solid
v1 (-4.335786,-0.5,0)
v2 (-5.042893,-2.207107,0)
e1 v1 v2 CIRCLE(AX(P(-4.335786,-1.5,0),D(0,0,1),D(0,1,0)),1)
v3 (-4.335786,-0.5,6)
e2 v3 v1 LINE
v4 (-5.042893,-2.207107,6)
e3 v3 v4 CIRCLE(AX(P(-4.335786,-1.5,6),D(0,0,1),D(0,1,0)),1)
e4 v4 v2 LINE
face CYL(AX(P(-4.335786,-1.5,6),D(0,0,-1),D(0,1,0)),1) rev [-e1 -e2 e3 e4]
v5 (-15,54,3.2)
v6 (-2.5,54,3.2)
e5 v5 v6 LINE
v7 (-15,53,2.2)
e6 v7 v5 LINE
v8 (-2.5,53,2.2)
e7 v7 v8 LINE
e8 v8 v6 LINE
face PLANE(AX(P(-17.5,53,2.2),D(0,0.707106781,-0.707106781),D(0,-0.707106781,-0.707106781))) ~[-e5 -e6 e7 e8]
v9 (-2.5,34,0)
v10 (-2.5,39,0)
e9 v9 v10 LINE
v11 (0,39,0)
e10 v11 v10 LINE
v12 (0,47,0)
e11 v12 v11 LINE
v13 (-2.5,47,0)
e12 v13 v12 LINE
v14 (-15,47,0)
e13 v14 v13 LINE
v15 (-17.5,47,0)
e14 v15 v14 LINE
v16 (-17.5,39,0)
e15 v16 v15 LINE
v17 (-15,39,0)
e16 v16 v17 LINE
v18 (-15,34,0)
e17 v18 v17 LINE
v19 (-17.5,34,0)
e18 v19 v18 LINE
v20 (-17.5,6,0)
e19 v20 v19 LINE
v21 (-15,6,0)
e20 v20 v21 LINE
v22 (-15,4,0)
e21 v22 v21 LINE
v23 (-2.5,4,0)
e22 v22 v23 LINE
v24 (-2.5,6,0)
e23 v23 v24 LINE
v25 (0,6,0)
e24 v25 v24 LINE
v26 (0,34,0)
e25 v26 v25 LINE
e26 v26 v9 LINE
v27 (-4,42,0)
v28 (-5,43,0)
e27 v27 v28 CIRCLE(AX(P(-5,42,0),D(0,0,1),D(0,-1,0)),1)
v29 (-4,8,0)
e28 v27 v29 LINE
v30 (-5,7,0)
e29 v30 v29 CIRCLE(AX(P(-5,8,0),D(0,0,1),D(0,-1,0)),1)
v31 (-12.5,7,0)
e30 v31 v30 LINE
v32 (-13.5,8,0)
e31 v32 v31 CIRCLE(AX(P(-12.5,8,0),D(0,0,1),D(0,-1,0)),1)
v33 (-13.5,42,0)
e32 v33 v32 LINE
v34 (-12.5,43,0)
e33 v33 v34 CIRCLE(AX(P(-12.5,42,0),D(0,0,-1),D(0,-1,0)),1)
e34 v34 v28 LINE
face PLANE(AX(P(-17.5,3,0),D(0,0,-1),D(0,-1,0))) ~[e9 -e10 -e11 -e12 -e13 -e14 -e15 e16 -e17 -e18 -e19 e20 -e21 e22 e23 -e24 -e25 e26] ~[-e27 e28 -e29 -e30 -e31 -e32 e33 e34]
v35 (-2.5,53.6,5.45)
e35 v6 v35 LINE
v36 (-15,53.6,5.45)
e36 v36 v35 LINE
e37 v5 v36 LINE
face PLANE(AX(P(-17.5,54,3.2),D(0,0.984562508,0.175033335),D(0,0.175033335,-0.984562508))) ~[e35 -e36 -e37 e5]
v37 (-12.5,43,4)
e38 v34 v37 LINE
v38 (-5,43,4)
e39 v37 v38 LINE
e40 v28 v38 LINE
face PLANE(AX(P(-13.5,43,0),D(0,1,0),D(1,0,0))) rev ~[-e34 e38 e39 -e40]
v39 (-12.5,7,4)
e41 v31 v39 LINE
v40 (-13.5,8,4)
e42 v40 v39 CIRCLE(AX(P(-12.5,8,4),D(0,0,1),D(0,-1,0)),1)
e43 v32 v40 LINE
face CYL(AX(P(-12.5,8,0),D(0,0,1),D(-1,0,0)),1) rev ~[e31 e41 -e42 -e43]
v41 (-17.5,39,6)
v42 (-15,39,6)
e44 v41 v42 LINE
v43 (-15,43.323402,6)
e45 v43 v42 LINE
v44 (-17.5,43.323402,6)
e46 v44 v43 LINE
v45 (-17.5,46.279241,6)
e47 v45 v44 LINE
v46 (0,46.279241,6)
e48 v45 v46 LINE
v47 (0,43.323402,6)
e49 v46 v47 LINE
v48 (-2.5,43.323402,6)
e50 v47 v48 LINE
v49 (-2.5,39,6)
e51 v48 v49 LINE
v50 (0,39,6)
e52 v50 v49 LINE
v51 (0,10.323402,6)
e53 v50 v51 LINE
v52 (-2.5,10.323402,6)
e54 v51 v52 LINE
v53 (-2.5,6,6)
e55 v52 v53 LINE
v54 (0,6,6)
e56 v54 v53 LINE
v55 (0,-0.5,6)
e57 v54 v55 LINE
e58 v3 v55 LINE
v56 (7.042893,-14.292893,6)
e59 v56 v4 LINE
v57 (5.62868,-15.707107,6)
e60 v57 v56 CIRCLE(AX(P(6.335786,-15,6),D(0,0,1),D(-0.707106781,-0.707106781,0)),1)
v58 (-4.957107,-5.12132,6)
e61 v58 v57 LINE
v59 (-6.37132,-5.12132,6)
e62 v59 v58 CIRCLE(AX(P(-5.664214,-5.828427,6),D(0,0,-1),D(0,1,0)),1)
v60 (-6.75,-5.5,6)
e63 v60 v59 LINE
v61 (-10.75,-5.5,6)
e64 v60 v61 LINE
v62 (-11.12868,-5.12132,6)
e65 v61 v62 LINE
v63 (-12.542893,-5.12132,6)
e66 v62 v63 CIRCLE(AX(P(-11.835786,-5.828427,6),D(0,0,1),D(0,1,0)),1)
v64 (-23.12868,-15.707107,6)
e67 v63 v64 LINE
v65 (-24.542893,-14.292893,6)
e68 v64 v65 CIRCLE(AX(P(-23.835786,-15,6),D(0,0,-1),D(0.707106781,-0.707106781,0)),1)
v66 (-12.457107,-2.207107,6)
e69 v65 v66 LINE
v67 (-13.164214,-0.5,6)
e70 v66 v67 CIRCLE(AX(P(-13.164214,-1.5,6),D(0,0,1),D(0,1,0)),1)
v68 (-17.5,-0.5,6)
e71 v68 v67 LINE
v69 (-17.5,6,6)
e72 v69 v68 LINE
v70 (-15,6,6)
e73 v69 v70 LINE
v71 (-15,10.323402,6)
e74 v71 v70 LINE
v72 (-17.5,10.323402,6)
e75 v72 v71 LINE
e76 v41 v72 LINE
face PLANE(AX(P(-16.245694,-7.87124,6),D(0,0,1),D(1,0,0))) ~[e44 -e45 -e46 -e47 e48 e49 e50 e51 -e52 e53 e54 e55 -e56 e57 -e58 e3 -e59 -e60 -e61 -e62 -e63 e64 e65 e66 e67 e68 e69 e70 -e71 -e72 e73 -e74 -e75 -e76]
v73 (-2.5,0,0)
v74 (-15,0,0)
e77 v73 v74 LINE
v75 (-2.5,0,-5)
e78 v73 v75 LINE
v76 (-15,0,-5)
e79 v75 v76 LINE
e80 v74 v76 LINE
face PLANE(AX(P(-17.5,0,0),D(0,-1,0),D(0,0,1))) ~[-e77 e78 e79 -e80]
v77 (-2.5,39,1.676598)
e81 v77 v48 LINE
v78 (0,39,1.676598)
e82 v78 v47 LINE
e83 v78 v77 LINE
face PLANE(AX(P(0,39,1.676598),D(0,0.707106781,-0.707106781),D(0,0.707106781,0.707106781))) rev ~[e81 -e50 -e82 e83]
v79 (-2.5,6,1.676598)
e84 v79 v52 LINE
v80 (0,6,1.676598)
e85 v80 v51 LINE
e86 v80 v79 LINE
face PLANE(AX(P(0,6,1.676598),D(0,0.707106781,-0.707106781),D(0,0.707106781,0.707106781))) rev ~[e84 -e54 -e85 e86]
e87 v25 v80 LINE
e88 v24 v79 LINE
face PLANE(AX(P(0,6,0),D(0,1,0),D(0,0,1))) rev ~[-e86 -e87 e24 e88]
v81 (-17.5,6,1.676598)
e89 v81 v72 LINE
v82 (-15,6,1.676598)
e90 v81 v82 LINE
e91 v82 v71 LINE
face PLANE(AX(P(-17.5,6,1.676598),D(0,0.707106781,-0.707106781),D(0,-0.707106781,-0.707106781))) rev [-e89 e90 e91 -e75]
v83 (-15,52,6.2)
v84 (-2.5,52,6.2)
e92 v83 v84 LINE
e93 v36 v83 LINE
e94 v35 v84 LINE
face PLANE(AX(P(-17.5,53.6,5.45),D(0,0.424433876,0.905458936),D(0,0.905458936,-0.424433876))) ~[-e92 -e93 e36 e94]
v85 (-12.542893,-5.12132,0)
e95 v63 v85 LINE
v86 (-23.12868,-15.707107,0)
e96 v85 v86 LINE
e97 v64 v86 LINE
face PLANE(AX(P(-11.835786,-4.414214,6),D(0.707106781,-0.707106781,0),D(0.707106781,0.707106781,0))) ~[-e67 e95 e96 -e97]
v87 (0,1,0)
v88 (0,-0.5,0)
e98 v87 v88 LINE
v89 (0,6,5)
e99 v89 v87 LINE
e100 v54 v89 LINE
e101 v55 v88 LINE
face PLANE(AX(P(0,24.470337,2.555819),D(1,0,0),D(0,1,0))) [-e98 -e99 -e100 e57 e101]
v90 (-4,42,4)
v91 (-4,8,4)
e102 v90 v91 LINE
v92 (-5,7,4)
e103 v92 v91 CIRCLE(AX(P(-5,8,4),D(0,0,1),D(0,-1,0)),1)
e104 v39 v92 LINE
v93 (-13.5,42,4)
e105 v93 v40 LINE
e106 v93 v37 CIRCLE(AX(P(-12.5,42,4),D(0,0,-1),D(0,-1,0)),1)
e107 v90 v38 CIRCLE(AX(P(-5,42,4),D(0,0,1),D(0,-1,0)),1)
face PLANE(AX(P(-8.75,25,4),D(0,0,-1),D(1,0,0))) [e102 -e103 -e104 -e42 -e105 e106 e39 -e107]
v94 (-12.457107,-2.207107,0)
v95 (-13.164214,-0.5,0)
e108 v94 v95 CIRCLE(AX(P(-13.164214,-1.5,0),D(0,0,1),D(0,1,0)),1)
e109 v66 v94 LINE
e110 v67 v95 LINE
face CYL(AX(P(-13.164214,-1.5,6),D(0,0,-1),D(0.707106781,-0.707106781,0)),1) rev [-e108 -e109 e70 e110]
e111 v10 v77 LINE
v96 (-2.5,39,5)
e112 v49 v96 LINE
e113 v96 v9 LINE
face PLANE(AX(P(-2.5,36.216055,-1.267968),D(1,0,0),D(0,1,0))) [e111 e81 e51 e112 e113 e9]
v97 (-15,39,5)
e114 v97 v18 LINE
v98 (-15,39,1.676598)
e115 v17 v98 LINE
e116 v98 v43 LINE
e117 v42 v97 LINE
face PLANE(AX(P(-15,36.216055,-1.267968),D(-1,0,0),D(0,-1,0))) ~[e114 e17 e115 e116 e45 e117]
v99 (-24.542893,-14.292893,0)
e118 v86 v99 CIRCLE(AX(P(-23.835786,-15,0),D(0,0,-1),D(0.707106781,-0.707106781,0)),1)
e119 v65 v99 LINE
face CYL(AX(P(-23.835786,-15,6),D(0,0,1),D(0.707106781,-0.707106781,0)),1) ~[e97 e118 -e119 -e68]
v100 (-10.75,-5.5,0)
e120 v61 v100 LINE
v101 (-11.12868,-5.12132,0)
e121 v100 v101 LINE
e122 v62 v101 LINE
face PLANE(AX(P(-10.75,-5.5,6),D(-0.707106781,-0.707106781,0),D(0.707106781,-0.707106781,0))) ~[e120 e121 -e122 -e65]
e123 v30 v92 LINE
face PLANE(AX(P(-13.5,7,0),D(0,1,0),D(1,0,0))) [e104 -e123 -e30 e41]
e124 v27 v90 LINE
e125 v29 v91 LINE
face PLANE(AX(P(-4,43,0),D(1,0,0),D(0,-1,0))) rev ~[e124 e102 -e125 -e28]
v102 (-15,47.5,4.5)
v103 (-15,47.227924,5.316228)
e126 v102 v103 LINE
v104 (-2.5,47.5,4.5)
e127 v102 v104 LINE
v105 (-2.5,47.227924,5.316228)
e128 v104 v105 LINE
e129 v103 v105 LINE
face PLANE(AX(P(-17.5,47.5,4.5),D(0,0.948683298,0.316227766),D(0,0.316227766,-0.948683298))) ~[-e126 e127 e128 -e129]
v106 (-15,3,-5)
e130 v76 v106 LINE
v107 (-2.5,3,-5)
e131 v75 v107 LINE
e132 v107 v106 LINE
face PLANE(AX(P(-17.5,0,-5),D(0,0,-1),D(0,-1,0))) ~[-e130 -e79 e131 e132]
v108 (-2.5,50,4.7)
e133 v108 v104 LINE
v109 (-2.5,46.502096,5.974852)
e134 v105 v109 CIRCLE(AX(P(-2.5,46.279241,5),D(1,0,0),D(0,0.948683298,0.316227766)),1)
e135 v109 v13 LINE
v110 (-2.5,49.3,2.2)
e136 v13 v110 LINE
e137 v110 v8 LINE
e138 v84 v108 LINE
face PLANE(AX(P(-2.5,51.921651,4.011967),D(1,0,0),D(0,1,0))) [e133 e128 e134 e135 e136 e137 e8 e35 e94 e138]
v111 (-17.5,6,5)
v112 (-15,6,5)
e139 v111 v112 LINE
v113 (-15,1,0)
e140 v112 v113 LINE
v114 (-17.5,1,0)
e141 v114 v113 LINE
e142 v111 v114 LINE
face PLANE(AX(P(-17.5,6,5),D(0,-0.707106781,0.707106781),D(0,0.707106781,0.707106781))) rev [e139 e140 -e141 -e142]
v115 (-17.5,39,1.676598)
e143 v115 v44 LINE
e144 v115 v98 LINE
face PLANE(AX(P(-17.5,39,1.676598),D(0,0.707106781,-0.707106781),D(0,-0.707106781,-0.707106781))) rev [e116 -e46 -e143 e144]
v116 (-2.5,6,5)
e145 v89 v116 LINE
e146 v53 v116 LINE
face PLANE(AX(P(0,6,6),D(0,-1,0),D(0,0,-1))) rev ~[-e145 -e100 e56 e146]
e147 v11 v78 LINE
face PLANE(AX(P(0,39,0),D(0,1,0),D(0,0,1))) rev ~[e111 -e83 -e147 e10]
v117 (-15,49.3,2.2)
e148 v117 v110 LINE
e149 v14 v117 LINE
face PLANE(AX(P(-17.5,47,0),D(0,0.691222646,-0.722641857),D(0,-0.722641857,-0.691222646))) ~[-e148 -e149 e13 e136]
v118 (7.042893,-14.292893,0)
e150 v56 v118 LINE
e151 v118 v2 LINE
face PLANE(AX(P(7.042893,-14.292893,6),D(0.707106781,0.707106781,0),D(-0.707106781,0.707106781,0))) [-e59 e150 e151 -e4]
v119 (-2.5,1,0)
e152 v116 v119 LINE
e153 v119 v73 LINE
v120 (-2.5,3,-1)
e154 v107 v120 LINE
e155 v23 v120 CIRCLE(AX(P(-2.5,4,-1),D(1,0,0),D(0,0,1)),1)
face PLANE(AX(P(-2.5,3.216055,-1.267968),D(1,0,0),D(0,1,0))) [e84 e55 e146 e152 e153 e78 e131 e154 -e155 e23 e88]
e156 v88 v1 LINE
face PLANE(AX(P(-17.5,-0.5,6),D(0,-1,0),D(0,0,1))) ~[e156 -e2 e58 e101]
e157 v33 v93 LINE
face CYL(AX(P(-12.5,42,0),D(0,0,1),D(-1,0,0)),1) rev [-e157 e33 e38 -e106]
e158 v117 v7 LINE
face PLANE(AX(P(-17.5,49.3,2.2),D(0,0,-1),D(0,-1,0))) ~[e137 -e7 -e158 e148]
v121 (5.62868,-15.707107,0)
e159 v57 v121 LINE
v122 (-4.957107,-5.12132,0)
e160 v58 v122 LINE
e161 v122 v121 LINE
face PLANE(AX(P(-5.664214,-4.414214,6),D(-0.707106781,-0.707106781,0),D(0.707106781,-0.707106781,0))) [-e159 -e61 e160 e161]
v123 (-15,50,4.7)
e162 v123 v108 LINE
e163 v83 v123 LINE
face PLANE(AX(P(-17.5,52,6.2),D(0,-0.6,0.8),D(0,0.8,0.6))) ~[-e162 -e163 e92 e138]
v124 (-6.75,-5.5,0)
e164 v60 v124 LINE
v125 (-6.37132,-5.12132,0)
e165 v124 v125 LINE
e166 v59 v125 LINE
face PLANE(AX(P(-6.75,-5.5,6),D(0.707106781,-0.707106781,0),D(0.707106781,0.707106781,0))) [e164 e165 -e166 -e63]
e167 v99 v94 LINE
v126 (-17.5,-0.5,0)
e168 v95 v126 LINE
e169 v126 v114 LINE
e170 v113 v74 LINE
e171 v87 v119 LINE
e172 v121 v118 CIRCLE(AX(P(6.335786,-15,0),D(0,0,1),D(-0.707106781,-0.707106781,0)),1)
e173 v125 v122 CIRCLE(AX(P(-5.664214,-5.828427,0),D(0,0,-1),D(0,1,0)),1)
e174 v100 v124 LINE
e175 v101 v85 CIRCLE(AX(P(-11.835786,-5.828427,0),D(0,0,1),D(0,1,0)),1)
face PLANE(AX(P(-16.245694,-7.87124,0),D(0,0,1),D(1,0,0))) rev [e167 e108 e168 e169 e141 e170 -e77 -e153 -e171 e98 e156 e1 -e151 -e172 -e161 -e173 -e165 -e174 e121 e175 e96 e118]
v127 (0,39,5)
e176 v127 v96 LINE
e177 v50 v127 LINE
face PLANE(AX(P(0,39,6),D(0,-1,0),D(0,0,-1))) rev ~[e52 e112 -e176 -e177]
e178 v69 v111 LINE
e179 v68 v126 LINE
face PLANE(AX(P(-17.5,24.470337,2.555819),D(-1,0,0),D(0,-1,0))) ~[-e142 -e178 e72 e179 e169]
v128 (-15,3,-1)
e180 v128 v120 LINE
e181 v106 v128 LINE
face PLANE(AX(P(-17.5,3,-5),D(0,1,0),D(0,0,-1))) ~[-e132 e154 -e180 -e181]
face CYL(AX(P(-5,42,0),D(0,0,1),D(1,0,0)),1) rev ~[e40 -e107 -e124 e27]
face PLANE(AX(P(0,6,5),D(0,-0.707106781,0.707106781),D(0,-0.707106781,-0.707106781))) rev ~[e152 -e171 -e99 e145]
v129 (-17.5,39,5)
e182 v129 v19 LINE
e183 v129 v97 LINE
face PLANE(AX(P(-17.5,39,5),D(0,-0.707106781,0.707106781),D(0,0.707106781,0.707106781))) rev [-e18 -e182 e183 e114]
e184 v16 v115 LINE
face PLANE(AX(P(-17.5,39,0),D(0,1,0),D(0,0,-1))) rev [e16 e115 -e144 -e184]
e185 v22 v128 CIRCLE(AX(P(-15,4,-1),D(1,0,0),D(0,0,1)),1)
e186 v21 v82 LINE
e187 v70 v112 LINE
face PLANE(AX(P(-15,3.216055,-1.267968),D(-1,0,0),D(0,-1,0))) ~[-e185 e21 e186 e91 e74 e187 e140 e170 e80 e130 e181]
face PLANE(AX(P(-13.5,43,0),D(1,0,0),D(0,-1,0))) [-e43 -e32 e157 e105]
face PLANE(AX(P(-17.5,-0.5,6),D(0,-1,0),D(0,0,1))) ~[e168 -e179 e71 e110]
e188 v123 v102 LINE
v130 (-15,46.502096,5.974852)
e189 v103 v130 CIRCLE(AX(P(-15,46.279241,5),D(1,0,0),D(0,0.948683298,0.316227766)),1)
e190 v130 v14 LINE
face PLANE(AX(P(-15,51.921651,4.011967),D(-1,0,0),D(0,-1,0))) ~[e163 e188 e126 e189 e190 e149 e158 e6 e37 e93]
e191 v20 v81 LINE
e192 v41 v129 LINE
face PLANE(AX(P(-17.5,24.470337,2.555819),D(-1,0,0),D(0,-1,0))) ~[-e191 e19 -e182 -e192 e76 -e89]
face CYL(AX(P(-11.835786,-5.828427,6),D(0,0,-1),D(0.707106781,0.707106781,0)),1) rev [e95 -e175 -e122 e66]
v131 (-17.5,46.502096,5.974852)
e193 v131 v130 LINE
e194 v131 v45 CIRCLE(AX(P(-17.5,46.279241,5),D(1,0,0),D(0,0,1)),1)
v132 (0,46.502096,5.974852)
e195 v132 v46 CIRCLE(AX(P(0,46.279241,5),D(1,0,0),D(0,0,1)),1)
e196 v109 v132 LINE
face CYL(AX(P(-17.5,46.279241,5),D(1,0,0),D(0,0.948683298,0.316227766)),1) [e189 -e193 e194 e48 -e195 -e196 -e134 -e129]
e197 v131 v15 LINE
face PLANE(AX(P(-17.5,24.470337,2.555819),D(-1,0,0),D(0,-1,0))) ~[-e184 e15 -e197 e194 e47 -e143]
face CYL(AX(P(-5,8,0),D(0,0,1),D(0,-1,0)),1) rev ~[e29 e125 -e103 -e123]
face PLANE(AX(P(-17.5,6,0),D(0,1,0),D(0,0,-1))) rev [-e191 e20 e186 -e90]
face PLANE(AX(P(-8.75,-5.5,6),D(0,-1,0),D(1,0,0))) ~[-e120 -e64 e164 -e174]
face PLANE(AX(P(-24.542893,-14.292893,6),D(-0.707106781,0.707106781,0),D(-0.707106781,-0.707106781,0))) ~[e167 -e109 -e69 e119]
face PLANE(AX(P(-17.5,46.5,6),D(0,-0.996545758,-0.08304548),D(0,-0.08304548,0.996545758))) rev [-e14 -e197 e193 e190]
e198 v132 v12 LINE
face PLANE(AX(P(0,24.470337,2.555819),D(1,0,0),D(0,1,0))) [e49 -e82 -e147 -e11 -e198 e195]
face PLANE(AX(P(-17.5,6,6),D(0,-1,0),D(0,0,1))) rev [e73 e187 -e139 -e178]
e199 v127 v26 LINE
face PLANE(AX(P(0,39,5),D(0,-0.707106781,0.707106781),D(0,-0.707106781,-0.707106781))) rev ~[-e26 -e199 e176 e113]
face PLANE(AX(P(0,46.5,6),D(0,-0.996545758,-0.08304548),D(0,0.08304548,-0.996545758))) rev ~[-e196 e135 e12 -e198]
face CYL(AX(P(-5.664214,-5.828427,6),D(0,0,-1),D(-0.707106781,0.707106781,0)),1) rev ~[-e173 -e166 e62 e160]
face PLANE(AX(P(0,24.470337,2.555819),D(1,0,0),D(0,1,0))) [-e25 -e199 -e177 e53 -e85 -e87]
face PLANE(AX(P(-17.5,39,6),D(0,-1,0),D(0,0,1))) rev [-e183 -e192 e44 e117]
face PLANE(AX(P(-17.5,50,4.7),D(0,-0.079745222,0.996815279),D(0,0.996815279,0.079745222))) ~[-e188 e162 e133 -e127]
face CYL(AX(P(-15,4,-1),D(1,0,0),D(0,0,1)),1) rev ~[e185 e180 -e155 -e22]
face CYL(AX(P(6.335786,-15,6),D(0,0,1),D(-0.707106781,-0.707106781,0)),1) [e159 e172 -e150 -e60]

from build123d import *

# Parameters (mm, degrees)
F1_DEPTH  = 8.75
F3_DEPTH  = 2.5
F4_R      = 1
F6_DEPTH  = 6
F8_DEPTH  = 2.5
F9_R      = 1
F11_W     = 9.5
F11_H     = 36
F12_DEPTH = 4
F13_R     = 1


# Not quite as in the source:
# - a feature of the source that left no trace in its solid (it failed there, or was rolled back) is left out
# - a pattern or mirror of a feature is missing from the dataset's text; its kind, count and spacing are read off the source's solid


with BuildPart() as f1:
    # F0 (on Right) → F1 (new body)
    with BuildSketch(Plane.YZ):
        Polygon((3, -5), (3, 0), (47, 0), (49.3, 2.2), (53, 2.2), (54, 3.2), (53.6, 5.45), (52, 6.2), (50, 4.7), (47.5, 4.5), (47, 6), (-0.5, 6), (-0.5, 0), (0, 0), (0, -5), align=None)
    extrude(amount=-F1_DEPTH)

    # F1_copies: F1 across plane


with BuildPart() as f1_1:
    add(f1.part)
    add(f1.part.mirror(Plane(origin=(-8.75, 0, 0), x_dir=(0, 0, -1), z_dir=(-1, 0, 0))))

    # F2 (on face) → F3 (cut)
    with BuildSketch(Plane.YZ):
        Polygon((6, 1.6765981284), (10.3234018716, 6), (6, 6), (6, 5), (1, 0), (-4.5781525858, 0), (-4.5781525858, -7.2408299893), (8, -7.2408299893), (8, 0), (6, 0), align=None)
        Polygon((41, 0), (39, 0), (39, 1.6765981284), (43.3234018716, 6), (39, 6), (39, 5), (34, 0), (28.4218474142, 0), (28.4218474142, -7.2408299893), (41, -7.2408299893), align=None)
        Polygon((74, 0), (72, 0), (72, 1.6765981284), (76.3234018716, 6), (72, 6), (72, 5), (67, 0), (61.4218474142, 0), (61.4218474142, -7.2408299893), (74, -7.2408299893), align=None)
    f3 = extrude(amount=-F3_DEPTH, mode=Mode.SUBTRACT)

    # F3_copies: F3 across plane
    add(f3.mirror(Plane(origin=(-8.75, 0, 0), x_dir=(0, 0, -1), z_dir=(-1, 0, 0))), mode=Mode.SUBTRACT)

    # F4
    f4_edges = [f1_1.edges().sort_by_distance(p)[0] for p in [
        (-8.75, 47, 6),
    ]]
    fillet(f4_edges, radius=F4_R)

    # F5 (on face) → F6 (join, through all)
    with BuildSketch(Plane.XY.offset(6)):
        with BuildLine():
            Line((-6.75, -0.5), (-8.75, -0.5))
            Line((-8.75, -0.5), (-8.75, -5.5))
            Line((-8.75, -5.5), (-6.75, -5.5))
            Line((-6.75, -5.5), (-5.6642135624, -4.4142135624))
            Line((-5.6642135624, -4.4142135624), (5.6286796564, -15.7071067812))
            ThreePointArc((5.6286796564, -15.7071067812), (7.0428932188, -15.7071067812), (7.0428932188, -14.2928932188))
            Line((7.0428932188, -14.2928932188), (-6.75, -0.5))
        make_face()
    f6 = extrude(amount=-F6_DEPTH)

    # F6_copies: F6 across plane
    add(f6.mirror(Plane(origin=(-8.75, 0, 0), x_dir=(0, 0, -1), z_dir=(-1, 0, 0))))

    # F7 (on face) → F8 (cut)
    with BuildSketch(Plane.YZ):
        Polygon((46.5, 7.9169040546), (46.5, 6), (47, 0), (57.128790766, 0), (57.128790766, 7.9169040546), align=None)
    f8 = extrude(amount=-F8_DEPTH, mode=Mode.SUBTRACT)

    # F8_copies: F8 across plane
    add(f8.mirror(Plane(origin=(-8.75, 0, 0), x_dir=(0, 0, -1), z_dir=(-1, 0, 0))), mode=Mode.SUBTRACT)

    # F9
    f9_edges = [f1_1.edges().sort_by_distance(p)[0] for p in [
        (-5.664214, -4.414214, 3),
        (-8.75, 3, 0),
        (-10.75, -0.5, 3),
        (-11.835786, -4.414214, 3),
        (-6.75, -0.5, 3),
    ]]
    fillet(f9_edges, radius=F9_R)

    # F11 (on face) → F12 (cut)
    with BuildSketch(Plane(origin=(0, 0, 0), x_dir=(1, 0, 0), z_dir=(0, 0, -1))):
        with Locations((-8.75, -25)):
            Rectangle(F11_W, F11_H)
    extrude(amount=-F12_DEPTH, mode=Mode.SUBTRACT)

    # F13
    f13_edges = [f1_1.edges().sort_by_distance(p)[0] for p in [
        (-13.5, 7, 2),
        (-4, 7, 2),
        (-13.5, 43, 2),
        (-4, 43, 2),
    ]]
    fillet(f13_edges, radius=F13_R)


solid = f1_1.part
